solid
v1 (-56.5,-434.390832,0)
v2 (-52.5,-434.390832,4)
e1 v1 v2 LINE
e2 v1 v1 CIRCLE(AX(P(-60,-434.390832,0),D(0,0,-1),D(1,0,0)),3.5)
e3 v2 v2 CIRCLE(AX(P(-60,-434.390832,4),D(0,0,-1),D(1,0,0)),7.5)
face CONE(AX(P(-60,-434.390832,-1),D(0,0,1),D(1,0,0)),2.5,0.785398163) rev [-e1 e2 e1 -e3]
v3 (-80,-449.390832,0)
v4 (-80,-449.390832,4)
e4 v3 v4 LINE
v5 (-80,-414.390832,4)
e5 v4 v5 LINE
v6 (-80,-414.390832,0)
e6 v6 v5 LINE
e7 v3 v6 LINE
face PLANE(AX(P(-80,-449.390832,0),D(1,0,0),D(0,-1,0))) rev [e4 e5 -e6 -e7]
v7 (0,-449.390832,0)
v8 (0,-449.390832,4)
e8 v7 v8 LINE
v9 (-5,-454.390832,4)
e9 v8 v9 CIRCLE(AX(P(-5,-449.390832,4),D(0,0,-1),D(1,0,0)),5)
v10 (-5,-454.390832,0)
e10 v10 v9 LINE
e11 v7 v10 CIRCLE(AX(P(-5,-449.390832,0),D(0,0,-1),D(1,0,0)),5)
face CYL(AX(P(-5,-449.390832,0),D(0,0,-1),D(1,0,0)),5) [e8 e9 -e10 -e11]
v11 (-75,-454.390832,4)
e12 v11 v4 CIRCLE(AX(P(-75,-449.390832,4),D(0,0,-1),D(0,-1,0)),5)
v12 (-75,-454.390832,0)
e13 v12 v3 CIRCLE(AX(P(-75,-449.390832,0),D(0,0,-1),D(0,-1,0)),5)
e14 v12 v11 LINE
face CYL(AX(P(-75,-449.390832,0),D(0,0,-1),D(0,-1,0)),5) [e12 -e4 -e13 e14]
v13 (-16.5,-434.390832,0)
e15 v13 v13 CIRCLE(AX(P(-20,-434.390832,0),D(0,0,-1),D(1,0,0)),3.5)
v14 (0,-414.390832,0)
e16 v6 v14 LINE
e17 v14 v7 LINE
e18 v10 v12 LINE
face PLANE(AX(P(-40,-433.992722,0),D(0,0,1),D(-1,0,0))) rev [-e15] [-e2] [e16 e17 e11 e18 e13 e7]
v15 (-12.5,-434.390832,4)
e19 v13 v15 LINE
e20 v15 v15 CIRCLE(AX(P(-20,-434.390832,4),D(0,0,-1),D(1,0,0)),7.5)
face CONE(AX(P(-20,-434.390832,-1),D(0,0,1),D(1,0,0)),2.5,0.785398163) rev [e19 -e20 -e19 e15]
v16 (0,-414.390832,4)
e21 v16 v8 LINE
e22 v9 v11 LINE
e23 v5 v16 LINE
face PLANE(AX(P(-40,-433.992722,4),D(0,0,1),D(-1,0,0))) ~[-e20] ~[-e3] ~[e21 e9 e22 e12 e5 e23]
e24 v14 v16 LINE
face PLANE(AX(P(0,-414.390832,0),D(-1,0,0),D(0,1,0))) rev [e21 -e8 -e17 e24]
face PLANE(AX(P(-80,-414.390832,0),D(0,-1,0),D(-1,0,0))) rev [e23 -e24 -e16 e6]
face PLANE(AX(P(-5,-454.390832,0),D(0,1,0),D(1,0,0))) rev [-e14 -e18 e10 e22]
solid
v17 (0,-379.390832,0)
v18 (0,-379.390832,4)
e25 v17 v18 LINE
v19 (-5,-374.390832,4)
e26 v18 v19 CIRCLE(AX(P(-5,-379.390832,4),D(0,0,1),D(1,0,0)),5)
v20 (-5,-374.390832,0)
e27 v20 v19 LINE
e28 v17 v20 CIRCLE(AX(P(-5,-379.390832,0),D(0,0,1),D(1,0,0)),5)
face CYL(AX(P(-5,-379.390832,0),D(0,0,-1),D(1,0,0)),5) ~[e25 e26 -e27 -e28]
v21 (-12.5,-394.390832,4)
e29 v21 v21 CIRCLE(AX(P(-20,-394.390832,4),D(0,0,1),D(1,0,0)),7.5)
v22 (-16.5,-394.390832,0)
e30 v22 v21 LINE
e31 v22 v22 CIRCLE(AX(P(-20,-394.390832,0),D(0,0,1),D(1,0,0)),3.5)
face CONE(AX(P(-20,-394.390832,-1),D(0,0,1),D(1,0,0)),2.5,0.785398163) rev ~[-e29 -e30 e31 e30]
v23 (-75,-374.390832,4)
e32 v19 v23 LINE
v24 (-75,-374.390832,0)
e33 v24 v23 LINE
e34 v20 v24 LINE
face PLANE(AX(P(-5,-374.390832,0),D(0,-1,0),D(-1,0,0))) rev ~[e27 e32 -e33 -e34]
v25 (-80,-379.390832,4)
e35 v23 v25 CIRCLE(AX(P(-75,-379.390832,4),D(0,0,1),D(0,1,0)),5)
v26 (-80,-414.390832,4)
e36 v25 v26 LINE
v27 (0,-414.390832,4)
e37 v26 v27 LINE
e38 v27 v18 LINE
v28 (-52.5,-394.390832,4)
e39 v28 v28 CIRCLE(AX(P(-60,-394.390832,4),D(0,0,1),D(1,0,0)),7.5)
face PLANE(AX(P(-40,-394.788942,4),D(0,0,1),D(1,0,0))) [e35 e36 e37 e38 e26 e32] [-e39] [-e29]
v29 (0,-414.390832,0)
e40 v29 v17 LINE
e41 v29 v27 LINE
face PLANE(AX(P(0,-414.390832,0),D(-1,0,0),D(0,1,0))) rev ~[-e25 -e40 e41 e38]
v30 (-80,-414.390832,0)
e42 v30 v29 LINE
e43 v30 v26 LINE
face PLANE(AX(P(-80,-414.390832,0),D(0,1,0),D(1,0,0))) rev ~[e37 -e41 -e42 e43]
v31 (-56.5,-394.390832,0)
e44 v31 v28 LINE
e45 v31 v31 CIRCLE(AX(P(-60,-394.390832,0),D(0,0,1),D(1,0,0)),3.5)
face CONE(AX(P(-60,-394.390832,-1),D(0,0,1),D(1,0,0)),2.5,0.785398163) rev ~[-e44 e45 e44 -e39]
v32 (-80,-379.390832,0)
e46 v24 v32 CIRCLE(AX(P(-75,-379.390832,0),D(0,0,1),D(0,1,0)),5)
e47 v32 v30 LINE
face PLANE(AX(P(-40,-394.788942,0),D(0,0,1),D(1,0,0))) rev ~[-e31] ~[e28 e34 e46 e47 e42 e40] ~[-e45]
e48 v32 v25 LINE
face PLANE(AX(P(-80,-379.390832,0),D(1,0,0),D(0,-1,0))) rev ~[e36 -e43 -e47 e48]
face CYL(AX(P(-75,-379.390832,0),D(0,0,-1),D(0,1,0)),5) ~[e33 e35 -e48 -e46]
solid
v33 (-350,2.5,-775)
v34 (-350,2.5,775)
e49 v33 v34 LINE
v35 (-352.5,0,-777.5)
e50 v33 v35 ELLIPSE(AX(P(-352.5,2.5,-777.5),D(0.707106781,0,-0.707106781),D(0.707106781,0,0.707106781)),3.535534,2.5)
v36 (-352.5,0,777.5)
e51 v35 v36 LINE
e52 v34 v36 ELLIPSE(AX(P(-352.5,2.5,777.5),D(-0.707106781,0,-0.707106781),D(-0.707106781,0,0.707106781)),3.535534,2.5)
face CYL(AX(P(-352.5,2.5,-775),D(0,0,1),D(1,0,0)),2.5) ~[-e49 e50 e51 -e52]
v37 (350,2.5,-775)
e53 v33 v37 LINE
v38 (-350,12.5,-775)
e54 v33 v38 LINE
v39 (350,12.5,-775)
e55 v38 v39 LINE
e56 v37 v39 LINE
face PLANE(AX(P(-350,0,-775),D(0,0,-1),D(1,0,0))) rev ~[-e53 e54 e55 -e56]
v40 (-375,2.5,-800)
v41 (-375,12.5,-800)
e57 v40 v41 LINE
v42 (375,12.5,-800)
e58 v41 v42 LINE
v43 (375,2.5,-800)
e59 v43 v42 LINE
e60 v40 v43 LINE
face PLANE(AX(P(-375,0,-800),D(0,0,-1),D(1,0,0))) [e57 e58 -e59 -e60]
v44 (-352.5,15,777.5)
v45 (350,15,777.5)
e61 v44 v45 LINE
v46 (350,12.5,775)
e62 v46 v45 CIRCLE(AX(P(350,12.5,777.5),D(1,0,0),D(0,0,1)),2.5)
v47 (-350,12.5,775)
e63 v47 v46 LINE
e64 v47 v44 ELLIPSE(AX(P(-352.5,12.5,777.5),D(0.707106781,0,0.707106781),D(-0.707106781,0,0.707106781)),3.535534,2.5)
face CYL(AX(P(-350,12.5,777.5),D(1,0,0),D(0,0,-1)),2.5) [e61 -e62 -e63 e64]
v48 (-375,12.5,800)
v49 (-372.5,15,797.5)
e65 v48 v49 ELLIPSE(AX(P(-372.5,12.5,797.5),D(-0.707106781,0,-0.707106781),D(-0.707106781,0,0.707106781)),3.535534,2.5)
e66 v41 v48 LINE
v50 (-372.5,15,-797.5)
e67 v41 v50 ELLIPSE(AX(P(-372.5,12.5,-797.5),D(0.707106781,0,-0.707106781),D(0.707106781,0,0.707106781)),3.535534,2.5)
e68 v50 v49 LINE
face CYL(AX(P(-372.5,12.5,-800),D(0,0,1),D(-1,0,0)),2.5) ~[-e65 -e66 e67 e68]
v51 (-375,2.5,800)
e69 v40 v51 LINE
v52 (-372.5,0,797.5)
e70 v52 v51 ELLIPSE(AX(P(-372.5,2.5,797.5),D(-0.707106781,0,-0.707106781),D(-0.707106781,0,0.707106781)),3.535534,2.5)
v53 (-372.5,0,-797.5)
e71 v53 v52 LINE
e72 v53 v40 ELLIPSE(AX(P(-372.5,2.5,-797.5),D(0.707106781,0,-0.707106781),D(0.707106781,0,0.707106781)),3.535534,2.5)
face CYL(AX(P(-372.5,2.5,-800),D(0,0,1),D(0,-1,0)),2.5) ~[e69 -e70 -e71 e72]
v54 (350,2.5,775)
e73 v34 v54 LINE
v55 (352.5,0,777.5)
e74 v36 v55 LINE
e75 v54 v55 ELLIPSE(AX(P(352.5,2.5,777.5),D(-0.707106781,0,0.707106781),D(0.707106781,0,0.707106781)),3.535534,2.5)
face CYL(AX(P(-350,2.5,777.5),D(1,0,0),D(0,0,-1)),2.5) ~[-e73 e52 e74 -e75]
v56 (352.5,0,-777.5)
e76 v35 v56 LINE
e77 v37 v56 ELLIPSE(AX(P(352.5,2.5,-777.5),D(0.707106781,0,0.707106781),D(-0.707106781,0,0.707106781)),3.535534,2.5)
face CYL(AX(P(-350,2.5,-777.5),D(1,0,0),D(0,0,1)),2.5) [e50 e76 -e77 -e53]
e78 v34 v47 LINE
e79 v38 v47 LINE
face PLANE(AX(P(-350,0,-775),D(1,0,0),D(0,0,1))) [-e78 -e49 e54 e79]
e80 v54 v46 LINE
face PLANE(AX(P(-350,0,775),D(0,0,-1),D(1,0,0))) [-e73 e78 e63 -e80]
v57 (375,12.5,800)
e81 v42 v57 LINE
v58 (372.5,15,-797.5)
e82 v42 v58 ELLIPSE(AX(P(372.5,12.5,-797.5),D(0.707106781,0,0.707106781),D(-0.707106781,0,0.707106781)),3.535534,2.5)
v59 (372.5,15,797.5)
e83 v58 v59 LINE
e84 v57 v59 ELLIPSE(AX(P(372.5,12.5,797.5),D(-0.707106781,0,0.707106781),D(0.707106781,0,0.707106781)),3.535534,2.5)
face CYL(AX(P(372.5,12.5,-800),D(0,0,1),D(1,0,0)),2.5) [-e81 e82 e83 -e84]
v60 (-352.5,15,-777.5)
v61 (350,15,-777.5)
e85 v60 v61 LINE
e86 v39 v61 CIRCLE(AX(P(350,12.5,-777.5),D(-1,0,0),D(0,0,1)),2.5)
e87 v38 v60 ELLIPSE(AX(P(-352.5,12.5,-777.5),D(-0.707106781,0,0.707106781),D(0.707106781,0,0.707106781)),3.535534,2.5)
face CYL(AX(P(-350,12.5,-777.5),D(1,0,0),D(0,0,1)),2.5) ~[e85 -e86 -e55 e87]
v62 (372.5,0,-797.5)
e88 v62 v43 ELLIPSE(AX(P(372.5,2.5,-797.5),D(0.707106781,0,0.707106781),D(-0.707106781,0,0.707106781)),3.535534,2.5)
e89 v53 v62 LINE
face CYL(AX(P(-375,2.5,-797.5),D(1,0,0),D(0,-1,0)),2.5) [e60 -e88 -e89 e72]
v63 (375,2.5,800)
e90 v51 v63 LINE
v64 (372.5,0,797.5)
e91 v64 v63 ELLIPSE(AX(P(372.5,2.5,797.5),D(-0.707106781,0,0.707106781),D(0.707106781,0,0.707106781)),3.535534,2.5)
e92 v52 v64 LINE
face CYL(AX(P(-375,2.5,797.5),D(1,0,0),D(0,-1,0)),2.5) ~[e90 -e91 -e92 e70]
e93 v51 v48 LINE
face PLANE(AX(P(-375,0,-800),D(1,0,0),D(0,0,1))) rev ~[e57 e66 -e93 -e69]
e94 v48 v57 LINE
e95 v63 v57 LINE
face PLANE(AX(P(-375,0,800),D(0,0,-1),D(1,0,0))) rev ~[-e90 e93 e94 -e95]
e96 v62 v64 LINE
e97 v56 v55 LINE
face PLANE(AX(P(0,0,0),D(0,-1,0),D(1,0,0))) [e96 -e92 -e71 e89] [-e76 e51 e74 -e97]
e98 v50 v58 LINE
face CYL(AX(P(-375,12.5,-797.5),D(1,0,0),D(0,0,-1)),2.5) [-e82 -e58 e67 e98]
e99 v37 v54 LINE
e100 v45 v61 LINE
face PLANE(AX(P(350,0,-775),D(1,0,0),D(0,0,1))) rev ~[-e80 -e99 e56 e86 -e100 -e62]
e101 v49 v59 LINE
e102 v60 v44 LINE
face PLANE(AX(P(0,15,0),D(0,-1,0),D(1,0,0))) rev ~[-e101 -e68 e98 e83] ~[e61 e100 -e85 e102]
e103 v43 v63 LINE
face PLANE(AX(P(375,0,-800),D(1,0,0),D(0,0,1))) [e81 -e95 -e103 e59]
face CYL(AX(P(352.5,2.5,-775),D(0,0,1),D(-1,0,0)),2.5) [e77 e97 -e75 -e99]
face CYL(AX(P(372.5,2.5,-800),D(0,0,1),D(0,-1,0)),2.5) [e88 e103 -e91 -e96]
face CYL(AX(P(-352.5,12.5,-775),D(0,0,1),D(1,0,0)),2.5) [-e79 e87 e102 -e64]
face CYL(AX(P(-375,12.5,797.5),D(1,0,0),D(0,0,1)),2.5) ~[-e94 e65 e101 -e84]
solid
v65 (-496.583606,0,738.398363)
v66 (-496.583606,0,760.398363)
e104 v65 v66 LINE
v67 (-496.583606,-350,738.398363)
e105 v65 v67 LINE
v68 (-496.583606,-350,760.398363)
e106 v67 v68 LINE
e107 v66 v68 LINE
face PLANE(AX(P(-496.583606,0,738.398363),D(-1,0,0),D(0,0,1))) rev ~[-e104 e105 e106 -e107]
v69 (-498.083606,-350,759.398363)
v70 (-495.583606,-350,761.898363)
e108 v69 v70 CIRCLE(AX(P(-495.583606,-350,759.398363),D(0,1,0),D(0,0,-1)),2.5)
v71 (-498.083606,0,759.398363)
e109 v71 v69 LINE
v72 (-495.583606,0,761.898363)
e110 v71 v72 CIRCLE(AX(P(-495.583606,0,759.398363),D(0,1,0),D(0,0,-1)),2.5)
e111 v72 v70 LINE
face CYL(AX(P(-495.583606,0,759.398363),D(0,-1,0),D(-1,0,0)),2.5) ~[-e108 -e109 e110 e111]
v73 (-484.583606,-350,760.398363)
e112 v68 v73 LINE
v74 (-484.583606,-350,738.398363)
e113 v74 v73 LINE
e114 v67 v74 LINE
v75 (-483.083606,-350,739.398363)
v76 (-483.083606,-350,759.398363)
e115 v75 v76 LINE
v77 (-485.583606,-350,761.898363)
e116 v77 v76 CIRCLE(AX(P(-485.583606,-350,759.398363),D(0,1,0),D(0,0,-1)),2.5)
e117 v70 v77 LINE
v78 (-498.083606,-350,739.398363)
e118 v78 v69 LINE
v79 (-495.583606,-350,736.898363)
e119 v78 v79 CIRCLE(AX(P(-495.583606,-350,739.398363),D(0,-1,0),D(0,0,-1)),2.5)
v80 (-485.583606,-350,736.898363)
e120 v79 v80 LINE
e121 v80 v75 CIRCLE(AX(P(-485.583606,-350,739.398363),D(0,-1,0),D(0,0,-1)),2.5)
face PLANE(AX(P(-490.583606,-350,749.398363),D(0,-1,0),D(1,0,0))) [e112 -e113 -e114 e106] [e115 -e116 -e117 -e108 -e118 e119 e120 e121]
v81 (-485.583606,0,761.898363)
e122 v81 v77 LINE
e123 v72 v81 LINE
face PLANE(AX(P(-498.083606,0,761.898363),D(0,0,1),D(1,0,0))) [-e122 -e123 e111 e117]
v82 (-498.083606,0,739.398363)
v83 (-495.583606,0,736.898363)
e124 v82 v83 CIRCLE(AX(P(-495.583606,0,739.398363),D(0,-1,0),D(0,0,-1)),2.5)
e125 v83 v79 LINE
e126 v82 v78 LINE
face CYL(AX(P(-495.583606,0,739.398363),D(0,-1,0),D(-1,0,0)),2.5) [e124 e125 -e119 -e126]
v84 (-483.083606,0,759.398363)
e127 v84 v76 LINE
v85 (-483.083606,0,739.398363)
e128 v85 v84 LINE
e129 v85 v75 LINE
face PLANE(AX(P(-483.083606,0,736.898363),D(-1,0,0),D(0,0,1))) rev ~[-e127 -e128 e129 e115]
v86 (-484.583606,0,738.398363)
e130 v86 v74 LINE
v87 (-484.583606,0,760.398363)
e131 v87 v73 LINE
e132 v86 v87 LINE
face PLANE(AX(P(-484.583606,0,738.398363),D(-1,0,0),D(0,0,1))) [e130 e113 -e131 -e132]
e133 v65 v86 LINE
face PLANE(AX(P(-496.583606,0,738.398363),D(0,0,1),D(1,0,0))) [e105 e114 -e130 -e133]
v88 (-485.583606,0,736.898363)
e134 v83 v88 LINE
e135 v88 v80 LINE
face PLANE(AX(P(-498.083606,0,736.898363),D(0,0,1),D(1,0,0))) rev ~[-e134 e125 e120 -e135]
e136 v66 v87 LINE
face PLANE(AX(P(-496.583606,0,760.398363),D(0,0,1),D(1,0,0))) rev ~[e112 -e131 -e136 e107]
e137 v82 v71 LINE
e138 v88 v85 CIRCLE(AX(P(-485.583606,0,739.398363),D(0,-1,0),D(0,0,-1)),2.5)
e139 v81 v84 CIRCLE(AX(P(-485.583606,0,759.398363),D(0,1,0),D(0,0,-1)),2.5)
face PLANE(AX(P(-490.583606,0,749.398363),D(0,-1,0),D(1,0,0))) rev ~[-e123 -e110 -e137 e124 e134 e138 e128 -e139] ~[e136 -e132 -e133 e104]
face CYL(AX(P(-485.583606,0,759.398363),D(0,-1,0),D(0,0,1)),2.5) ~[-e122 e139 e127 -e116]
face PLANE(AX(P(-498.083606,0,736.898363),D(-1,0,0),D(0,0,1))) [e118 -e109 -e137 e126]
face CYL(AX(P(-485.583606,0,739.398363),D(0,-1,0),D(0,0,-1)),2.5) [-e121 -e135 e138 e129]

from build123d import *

# Parameters (mm, degrees)
F0_W     = 750
F0_H     = 1600
F0_W_2   = 700
F0_H_2   = 1550
F1_DEPTH = 15
F2_W     = 15
F2_H     = 25
F2_W_2   = 12
F2_H_2   = 22
F3_DEPTH = 350
F4_R     = 2.5
F5_DEPTH = 4
F8_R     = 2.5
F8_2_R   = 2.5
F9_R     = 2.5


# Not quite as in the source:
# - a fillet or chamfer that OpenCascade refuses, or shapes differently, is made with other operations: its cross-section is extruded or revolved along the edge and cut away or added


with BuildPart() as f1:
    # F0 (on Front) → F1 (new body)
    with BuildSketch(Plane.XZ):
        Rectangle(F0_W, F0_H)
        Rectangle(F0_W_2, F0_H_2, mode=Mode.SUBTRACT)
    extrude(amount=-F1_DEPTH)

    # F8
    f8_edges = [f1.edges().sort_by_distance(p)[0] for p in [
        (-350, 0, 0),
        (0, 0, 775),
        (350, 0, 0),
        (0, 15, -775),
        (0, 0, -775),
        (-350, 15, 0),
        (0, 15, 775),
    ]]
    fillet(f8_edges, radius=F8_R)

    # F9
    f9_edges = [f1.edges().sort_by_distance(p)[0] for p in [
        (-375, 15, 0),
        (-375, 0, 0),
        (0, 15, 800),
        (0, 0, 800),
        (375, 0, 0),
        (375, 15, 0),
        (0, 15, -800),
        (0, 0, -800),
    ]]
    fillet(f9_edges, radius=F9_R)


with BuildPart() as f3:
    # F2 (on face) → F3 (new body)
    with BuildSketch(Plane.XZ):
        with Locations((-490.5836057663, 749.3983626366)):
            Rectangle(F2_W, F2_H)
        with Locations((-490.5836057663, 749.3983626366)):
            Rectangle(F2_W_2, F2_H_2, mode=Mode.SUBTRACT)
    extrude(amount=F3_DEPTH)

    # F8#2
    f8_2_edges = [f3.edges().sort_by_distance(p)[0] for p in [
        (-483.083606, -175, 736.898363),
        (-498.083606, -175, 761.898363),
        (-483.083606, -175, 761.898363),
        (-498.083606, -175, 736.898363),
    ]]
    fillet(f8_2_edges, radius=F8_2_R)


with BuildPart() as f5:
    # F4 (on Top) → F5 (new body)
    with BuildSketch(Plane.XY):
        with BuildLine():
            Line((-5, -374.3908321857), (-75, -374.3908321857))
            ThreePointArc((-75, -374.3908321857), (-78.5355339059, -375.8552982798), (-80, -379.3908321857))
            Line((-80, -379.3908321857), (-80, -414.3908321857))
            Line((-80, -414.3908321857), (0, -414.3908321857))
            Line((0, -414.3908321857), (0, -379.3908321857))
            ThreePointArc((0, -379.3908321857), (-1.4644660941, -375.8552982798), (-5, -374.3908321857))
        make_face()
        with Locations((-60, -394.3908321857)):
            Circle(F4_R, mode=Mode.SUBTRACT)
        with Locations((-20, -394.3908321857)):
            Circle(F4_R, mode=Mode.SUBTRACT)
    extrude(amount=F5_DEPTH)

    # F6: chamfer of 5 on 2 edges, made by hand

    # F6_s1 → F6_t2 (revolve, cut)
    with BuildSketch(Plane.XZ.offset(394.3908321857)):
        Polygon((-17.5, -1), (-12.5, 4), (-17.5, 4), align=None)
    revolve(axis=Axis((-20, -394.3908321857, 4), (0, 0, 1)), mode=Mode.SUBTRACT)

    # F6_s3 → F6_t4 (revolve, cut)
    with BuildSketch(Plane.XZ.offset(394.3908321857)):
        Polygon((-57.5, -1), (-52.5, 4), (-57.5, 4), align=None)
    revolve(axis=Axis((-60, -394.3908321857, 4), (0, 0, 1)), mode=Mode.SUBTRACT)


with BuildPart() as f7_1:
    # F7: instance of F5
    add(f5.part.mirror(Plane(origin=(-40, -414.3908321857, 2), x_dir=(1, 0, 0), z_dir=(0, -1, 0))))


solid = Compound([f1.part, f3.part, f5.part, f7_1.part])
